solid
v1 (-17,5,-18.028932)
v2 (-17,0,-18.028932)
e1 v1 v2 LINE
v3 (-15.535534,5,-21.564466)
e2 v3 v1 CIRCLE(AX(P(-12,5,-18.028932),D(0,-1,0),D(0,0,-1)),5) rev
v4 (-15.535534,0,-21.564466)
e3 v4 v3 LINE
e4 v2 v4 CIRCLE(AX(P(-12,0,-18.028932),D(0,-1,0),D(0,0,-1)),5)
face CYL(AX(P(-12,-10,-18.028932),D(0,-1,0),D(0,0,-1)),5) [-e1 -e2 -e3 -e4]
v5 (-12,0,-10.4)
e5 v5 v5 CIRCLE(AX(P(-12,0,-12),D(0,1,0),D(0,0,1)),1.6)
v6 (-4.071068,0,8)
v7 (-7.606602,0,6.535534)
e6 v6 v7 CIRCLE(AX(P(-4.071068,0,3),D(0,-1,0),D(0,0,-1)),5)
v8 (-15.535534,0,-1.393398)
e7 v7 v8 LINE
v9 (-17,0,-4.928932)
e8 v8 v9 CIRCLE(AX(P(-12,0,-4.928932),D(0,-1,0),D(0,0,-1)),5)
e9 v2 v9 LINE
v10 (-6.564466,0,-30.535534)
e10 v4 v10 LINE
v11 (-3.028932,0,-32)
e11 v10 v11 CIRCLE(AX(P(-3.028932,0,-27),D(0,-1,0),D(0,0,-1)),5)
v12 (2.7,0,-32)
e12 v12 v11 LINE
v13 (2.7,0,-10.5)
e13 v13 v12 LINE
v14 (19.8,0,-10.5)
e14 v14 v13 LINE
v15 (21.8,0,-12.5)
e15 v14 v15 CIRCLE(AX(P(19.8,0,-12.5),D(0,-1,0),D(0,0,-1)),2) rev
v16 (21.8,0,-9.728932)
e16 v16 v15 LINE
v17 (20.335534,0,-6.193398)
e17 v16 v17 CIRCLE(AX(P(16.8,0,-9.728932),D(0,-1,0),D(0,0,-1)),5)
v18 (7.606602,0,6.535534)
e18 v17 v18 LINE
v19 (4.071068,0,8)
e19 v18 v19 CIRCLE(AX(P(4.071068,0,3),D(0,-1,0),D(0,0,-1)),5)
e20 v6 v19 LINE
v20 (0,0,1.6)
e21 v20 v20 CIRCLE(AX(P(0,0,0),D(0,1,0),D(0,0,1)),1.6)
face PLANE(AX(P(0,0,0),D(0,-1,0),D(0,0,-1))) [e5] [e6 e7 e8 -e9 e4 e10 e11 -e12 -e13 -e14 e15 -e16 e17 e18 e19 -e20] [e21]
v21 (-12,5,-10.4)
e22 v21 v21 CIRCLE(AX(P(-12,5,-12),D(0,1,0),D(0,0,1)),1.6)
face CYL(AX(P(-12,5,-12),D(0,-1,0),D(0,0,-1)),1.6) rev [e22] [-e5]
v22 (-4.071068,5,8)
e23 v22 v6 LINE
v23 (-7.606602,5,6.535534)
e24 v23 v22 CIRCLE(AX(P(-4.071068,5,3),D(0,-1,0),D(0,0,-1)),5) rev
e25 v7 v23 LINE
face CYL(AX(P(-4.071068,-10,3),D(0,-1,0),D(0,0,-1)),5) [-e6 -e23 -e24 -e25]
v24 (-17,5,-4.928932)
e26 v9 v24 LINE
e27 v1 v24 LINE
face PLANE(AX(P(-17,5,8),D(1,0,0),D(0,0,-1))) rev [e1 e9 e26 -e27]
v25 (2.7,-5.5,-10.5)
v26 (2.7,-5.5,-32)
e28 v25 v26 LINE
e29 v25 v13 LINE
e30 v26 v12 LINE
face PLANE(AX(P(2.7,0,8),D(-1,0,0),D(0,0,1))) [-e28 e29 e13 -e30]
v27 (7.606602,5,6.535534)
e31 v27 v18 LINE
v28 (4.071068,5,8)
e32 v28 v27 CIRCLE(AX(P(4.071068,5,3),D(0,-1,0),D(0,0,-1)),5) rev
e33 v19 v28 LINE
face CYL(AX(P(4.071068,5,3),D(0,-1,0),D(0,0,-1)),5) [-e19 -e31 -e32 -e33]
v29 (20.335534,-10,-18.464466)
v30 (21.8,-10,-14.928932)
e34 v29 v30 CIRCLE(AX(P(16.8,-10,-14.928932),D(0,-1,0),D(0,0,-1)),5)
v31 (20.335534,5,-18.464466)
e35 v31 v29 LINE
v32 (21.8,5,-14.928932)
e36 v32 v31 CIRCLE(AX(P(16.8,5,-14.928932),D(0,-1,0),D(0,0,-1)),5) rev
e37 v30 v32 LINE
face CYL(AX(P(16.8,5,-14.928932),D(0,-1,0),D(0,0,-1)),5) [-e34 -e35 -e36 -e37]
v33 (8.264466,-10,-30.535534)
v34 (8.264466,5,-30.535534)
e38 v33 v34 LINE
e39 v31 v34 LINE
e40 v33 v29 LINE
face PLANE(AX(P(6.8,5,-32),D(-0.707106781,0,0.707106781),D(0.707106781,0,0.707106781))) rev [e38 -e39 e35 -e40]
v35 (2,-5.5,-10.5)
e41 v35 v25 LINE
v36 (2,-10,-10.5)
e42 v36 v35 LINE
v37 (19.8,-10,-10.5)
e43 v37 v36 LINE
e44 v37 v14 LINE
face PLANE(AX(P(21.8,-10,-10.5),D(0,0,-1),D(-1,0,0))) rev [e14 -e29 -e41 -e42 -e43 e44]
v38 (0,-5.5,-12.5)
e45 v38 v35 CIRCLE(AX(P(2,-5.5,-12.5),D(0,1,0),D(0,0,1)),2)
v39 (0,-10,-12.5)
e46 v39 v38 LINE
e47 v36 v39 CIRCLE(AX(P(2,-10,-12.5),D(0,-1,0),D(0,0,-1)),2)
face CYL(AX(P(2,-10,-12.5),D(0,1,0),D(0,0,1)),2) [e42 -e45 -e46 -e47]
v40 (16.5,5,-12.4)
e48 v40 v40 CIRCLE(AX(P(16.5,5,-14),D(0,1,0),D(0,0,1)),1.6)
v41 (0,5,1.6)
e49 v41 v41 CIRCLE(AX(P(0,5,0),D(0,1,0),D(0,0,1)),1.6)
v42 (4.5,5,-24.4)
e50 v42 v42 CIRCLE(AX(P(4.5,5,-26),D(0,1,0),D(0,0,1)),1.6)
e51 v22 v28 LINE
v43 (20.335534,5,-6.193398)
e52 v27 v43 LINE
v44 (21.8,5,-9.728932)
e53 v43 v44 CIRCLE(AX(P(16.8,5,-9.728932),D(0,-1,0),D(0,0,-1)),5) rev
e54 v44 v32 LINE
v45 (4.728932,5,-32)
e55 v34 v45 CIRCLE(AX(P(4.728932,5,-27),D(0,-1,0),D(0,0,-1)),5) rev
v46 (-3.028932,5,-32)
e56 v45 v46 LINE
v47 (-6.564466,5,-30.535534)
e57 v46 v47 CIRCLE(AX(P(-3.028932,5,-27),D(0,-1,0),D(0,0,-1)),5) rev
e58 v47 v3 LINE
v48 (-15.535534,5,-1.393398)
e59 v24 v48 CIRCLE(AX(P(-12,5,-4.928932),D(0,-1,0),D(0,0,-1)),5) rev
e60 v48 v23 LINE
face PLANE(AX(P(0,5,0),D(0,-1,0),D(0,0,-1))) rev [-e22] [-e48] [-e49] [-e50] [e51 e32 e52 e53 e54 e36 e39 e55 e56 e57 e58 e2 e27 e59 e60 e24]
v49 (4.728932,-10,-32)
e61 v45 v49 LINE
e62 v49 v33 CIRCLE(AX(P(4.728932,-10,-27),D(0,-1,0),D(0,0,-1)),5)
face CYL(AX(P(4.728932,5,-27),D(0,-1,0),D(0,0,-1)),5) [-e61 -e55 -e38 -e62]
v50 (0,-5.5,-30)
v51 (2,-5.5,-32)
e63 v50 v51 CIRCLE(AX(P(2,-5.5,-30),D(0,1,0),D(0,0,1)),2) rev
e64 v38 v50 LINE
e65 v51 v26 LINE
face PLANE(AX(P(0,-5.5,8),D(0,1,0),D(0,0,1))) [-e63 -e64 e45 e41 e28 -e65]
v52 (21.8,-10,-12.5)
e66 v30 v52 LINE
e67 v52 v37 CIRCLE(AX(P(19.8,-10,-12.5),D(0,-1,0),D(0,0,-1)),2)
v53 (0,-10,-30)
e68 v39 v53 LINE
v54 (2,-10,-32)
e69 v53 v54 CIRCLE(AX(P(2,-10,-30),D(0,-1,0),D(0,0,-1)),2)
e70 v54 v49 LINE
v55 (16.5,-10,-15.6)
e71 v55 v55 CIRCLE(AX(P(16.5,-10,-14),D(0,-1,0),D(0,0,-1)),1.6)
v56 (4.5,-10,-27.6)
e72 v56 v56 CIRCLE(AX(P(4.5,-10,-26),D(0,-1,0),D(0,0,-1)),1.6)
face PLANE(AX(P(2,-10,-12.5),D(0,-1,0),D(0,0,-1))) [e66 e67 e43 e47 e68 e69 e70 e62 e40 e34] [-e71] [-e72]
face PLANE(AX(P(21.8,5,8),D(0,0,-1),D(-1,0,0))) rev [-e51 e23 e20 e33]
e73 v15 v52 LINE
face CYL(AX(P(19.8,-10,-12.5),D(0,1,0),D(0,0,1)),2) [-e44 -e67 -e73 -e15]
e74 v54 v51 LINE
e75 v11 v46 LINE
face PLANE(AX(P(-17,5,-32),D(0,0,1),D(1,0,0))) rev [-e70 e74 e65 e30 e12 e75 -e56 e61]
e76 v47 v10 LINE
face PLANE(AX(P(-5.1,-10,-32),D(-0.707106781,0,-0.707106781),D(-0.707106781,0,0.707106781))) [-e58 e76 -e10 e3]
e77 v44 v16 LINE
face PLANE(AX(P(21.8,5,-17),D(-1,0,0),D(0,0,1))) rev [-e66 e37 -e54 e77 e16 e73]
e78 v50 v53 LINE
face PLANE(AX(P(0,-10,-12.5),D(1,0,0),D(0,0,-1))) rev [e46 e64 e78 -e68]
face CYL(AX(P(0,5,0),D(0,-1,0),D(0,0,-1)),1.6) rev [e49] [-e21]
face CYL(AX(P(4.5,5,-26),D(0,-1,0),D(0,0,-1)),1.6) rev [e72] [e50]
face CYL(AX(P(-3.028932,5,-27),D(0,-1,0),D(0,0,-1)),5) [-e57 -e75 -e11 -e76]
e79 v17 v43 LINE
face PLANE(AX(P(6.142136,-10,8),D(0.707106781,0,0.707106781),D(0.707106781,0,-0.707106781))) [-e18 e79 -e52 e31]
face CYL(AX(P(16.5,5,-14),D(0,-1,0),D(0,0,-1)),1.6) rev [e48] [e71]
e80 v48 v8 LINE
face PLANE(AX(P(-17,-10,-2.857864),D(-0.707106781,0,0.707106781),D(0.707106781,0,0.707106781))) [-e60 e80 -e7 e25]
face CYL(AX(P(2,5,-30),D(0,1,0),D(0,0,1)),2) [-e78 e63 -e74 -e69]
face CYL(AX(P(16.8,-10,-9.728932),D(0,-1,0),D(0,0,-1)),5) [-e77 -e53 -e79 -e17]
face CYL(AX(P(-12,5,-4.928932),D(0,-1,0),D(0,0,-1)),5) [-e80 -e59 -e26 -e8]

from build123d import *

# Parameters (mm, degrees)
SKETCH_1_R          = 1.6
EXTRUDE_1_DEPTH     = 5
EXTRUDE_START       = 10
SKETCH_2_R          = 1.6
EXTRUDE_2_DEPTH     = 10
SKETCH_3_OUTSIDE_W  = 52.342
SKETCH_3_OUTSIDE_H  = 53.542
CUT_EXTRUDE_1_DEPTH = 42.523968982
FILLET_1_R          = 5
FILLET_2_R          = 2
SKETCH_4_W          = 2.7
SKETCH_4_H          = 5.5
CUT_EXTRUDE_2_DEPTH = 53.191953403


with BuildPart() as part:
    # 草图1 → 凸台-拉伸1 (new body)
    with BuildSketch(Plane(origin=(0, 0, 0), x_dir=(1, 0, 0), z_dir=(0, 1, 0))):
        Polygon((6.8, 32), (21.8, 17), (21.8, -8), (-17, -8), (-17, 32), align=None)
        Circle(SKETCH_1_R, mode=Mode.SUBTRACT)
        with Locations((-12, 12)):
            Circle(SKETCH_1_R, mode=Mode.SUBTRACT)
        with Locations((4.5, 26)):
            Circle(SKETCH_1_R, mode=Mode.SUBTRACT)
        with Locations((16.5, 14)):
            Circle(SKETCH_1_R, mode=Mode.SUBTRACT)
    extrude(amount=EXTRUDE_1_DEPTH)

    # 草图2 → 凸台-拉伸2 (add)
    with BuildSketch(Plane.XZ.offset(EXTRUDE_START)):
        with BuildLine():
            Line((21.8, -10.5), (2, -10.5))
            ThreePointArc((2, -10.5), (0.585786438, -11.085786438), (0, -12.5))
            Line((0, -12.5), (0, -32))
            Line((0, -32), (6.8, -32))
            Line((6.8, -32), (21.8, -17))
            Line((21.8, -17), (21.8, -10.5))
        make_face()
        with Locations((4.5, -26)):
            Circle(SKETCH_2_R, mode=Mode.SUBTRACT)
        with Locations((16.5, -14)):
            Circle(SKETCH_2_R, mode=Mode.SUBTRACT)
    extrude(amount=-EXTRUDE_2_DEPTH)

    # 草图3 outside → 切除-拉伸1 (cut, through all)
    with BuildSketch(Plane(origin=(0, 5, 0), x_dir=(1, 0, 0), z_dir=(0, 1, 0))):
        with Locations((2.4, 12)):
            Rectangle(SKETCH_3_OUTSIDE_W, SKETCH_3_OUTSIDE_H)
        Polygon((-5.1, 32), (-17, 20.1), (-17, 2.857864376), (-6.142135624, -8), (6.142135624, -8), (21.8, 7.657864376), (21.8, 17), (6.8, 32), align=None, mode=Mode.SUBTRACT)
    extrude(amount=-CUT_EXTRUDE_1_DEPTH, mode=Mode.SUBTRACT)

    # 圆角1
    fillet_1_edges = [part.edges().sort_by_distance(p)[0] for p in [
        (21.8, 2.5, -7.657864376),
        (6.142135624, 2.5, 8),
        (-6.142135624, 2.5, 8),
        (-17, 2.5, -2.857864376),
        (-17, 2.5, -20.1),
        (-5.1, 2.5, -32),
        (21.8, -2.5, -17),
        (6.8, -2.5, -32),
    ]]
    fillet(fillet_1_edges, radius=FILLET_1_R)

    # 圆角2
    fillet_2_edges = [part.edges().sort_by_distance(p)[0] for p in [
        (0, -5, -32),
        (21.8, -5, -10.5),
    ]]
    fillet(fillet_2_edges, radius=FILLET_2_R)

    # 草图4 → 切除-拉伸2 (cut, through all)
    with BuildSketch(Plane(origin=(-10.2, 0, -32), x_dir=(1, 0, 0), z_dir=(0, 0, 1))):
        with Locations((11.55, -2.75)):
            Rectangle(SKETCH_4_W, SKETCH_4_H)
    extrude(amount=CUT_EXTRUDE_2_DEPTH, mode=Mode.SUBTRACT)


solid = part.part
